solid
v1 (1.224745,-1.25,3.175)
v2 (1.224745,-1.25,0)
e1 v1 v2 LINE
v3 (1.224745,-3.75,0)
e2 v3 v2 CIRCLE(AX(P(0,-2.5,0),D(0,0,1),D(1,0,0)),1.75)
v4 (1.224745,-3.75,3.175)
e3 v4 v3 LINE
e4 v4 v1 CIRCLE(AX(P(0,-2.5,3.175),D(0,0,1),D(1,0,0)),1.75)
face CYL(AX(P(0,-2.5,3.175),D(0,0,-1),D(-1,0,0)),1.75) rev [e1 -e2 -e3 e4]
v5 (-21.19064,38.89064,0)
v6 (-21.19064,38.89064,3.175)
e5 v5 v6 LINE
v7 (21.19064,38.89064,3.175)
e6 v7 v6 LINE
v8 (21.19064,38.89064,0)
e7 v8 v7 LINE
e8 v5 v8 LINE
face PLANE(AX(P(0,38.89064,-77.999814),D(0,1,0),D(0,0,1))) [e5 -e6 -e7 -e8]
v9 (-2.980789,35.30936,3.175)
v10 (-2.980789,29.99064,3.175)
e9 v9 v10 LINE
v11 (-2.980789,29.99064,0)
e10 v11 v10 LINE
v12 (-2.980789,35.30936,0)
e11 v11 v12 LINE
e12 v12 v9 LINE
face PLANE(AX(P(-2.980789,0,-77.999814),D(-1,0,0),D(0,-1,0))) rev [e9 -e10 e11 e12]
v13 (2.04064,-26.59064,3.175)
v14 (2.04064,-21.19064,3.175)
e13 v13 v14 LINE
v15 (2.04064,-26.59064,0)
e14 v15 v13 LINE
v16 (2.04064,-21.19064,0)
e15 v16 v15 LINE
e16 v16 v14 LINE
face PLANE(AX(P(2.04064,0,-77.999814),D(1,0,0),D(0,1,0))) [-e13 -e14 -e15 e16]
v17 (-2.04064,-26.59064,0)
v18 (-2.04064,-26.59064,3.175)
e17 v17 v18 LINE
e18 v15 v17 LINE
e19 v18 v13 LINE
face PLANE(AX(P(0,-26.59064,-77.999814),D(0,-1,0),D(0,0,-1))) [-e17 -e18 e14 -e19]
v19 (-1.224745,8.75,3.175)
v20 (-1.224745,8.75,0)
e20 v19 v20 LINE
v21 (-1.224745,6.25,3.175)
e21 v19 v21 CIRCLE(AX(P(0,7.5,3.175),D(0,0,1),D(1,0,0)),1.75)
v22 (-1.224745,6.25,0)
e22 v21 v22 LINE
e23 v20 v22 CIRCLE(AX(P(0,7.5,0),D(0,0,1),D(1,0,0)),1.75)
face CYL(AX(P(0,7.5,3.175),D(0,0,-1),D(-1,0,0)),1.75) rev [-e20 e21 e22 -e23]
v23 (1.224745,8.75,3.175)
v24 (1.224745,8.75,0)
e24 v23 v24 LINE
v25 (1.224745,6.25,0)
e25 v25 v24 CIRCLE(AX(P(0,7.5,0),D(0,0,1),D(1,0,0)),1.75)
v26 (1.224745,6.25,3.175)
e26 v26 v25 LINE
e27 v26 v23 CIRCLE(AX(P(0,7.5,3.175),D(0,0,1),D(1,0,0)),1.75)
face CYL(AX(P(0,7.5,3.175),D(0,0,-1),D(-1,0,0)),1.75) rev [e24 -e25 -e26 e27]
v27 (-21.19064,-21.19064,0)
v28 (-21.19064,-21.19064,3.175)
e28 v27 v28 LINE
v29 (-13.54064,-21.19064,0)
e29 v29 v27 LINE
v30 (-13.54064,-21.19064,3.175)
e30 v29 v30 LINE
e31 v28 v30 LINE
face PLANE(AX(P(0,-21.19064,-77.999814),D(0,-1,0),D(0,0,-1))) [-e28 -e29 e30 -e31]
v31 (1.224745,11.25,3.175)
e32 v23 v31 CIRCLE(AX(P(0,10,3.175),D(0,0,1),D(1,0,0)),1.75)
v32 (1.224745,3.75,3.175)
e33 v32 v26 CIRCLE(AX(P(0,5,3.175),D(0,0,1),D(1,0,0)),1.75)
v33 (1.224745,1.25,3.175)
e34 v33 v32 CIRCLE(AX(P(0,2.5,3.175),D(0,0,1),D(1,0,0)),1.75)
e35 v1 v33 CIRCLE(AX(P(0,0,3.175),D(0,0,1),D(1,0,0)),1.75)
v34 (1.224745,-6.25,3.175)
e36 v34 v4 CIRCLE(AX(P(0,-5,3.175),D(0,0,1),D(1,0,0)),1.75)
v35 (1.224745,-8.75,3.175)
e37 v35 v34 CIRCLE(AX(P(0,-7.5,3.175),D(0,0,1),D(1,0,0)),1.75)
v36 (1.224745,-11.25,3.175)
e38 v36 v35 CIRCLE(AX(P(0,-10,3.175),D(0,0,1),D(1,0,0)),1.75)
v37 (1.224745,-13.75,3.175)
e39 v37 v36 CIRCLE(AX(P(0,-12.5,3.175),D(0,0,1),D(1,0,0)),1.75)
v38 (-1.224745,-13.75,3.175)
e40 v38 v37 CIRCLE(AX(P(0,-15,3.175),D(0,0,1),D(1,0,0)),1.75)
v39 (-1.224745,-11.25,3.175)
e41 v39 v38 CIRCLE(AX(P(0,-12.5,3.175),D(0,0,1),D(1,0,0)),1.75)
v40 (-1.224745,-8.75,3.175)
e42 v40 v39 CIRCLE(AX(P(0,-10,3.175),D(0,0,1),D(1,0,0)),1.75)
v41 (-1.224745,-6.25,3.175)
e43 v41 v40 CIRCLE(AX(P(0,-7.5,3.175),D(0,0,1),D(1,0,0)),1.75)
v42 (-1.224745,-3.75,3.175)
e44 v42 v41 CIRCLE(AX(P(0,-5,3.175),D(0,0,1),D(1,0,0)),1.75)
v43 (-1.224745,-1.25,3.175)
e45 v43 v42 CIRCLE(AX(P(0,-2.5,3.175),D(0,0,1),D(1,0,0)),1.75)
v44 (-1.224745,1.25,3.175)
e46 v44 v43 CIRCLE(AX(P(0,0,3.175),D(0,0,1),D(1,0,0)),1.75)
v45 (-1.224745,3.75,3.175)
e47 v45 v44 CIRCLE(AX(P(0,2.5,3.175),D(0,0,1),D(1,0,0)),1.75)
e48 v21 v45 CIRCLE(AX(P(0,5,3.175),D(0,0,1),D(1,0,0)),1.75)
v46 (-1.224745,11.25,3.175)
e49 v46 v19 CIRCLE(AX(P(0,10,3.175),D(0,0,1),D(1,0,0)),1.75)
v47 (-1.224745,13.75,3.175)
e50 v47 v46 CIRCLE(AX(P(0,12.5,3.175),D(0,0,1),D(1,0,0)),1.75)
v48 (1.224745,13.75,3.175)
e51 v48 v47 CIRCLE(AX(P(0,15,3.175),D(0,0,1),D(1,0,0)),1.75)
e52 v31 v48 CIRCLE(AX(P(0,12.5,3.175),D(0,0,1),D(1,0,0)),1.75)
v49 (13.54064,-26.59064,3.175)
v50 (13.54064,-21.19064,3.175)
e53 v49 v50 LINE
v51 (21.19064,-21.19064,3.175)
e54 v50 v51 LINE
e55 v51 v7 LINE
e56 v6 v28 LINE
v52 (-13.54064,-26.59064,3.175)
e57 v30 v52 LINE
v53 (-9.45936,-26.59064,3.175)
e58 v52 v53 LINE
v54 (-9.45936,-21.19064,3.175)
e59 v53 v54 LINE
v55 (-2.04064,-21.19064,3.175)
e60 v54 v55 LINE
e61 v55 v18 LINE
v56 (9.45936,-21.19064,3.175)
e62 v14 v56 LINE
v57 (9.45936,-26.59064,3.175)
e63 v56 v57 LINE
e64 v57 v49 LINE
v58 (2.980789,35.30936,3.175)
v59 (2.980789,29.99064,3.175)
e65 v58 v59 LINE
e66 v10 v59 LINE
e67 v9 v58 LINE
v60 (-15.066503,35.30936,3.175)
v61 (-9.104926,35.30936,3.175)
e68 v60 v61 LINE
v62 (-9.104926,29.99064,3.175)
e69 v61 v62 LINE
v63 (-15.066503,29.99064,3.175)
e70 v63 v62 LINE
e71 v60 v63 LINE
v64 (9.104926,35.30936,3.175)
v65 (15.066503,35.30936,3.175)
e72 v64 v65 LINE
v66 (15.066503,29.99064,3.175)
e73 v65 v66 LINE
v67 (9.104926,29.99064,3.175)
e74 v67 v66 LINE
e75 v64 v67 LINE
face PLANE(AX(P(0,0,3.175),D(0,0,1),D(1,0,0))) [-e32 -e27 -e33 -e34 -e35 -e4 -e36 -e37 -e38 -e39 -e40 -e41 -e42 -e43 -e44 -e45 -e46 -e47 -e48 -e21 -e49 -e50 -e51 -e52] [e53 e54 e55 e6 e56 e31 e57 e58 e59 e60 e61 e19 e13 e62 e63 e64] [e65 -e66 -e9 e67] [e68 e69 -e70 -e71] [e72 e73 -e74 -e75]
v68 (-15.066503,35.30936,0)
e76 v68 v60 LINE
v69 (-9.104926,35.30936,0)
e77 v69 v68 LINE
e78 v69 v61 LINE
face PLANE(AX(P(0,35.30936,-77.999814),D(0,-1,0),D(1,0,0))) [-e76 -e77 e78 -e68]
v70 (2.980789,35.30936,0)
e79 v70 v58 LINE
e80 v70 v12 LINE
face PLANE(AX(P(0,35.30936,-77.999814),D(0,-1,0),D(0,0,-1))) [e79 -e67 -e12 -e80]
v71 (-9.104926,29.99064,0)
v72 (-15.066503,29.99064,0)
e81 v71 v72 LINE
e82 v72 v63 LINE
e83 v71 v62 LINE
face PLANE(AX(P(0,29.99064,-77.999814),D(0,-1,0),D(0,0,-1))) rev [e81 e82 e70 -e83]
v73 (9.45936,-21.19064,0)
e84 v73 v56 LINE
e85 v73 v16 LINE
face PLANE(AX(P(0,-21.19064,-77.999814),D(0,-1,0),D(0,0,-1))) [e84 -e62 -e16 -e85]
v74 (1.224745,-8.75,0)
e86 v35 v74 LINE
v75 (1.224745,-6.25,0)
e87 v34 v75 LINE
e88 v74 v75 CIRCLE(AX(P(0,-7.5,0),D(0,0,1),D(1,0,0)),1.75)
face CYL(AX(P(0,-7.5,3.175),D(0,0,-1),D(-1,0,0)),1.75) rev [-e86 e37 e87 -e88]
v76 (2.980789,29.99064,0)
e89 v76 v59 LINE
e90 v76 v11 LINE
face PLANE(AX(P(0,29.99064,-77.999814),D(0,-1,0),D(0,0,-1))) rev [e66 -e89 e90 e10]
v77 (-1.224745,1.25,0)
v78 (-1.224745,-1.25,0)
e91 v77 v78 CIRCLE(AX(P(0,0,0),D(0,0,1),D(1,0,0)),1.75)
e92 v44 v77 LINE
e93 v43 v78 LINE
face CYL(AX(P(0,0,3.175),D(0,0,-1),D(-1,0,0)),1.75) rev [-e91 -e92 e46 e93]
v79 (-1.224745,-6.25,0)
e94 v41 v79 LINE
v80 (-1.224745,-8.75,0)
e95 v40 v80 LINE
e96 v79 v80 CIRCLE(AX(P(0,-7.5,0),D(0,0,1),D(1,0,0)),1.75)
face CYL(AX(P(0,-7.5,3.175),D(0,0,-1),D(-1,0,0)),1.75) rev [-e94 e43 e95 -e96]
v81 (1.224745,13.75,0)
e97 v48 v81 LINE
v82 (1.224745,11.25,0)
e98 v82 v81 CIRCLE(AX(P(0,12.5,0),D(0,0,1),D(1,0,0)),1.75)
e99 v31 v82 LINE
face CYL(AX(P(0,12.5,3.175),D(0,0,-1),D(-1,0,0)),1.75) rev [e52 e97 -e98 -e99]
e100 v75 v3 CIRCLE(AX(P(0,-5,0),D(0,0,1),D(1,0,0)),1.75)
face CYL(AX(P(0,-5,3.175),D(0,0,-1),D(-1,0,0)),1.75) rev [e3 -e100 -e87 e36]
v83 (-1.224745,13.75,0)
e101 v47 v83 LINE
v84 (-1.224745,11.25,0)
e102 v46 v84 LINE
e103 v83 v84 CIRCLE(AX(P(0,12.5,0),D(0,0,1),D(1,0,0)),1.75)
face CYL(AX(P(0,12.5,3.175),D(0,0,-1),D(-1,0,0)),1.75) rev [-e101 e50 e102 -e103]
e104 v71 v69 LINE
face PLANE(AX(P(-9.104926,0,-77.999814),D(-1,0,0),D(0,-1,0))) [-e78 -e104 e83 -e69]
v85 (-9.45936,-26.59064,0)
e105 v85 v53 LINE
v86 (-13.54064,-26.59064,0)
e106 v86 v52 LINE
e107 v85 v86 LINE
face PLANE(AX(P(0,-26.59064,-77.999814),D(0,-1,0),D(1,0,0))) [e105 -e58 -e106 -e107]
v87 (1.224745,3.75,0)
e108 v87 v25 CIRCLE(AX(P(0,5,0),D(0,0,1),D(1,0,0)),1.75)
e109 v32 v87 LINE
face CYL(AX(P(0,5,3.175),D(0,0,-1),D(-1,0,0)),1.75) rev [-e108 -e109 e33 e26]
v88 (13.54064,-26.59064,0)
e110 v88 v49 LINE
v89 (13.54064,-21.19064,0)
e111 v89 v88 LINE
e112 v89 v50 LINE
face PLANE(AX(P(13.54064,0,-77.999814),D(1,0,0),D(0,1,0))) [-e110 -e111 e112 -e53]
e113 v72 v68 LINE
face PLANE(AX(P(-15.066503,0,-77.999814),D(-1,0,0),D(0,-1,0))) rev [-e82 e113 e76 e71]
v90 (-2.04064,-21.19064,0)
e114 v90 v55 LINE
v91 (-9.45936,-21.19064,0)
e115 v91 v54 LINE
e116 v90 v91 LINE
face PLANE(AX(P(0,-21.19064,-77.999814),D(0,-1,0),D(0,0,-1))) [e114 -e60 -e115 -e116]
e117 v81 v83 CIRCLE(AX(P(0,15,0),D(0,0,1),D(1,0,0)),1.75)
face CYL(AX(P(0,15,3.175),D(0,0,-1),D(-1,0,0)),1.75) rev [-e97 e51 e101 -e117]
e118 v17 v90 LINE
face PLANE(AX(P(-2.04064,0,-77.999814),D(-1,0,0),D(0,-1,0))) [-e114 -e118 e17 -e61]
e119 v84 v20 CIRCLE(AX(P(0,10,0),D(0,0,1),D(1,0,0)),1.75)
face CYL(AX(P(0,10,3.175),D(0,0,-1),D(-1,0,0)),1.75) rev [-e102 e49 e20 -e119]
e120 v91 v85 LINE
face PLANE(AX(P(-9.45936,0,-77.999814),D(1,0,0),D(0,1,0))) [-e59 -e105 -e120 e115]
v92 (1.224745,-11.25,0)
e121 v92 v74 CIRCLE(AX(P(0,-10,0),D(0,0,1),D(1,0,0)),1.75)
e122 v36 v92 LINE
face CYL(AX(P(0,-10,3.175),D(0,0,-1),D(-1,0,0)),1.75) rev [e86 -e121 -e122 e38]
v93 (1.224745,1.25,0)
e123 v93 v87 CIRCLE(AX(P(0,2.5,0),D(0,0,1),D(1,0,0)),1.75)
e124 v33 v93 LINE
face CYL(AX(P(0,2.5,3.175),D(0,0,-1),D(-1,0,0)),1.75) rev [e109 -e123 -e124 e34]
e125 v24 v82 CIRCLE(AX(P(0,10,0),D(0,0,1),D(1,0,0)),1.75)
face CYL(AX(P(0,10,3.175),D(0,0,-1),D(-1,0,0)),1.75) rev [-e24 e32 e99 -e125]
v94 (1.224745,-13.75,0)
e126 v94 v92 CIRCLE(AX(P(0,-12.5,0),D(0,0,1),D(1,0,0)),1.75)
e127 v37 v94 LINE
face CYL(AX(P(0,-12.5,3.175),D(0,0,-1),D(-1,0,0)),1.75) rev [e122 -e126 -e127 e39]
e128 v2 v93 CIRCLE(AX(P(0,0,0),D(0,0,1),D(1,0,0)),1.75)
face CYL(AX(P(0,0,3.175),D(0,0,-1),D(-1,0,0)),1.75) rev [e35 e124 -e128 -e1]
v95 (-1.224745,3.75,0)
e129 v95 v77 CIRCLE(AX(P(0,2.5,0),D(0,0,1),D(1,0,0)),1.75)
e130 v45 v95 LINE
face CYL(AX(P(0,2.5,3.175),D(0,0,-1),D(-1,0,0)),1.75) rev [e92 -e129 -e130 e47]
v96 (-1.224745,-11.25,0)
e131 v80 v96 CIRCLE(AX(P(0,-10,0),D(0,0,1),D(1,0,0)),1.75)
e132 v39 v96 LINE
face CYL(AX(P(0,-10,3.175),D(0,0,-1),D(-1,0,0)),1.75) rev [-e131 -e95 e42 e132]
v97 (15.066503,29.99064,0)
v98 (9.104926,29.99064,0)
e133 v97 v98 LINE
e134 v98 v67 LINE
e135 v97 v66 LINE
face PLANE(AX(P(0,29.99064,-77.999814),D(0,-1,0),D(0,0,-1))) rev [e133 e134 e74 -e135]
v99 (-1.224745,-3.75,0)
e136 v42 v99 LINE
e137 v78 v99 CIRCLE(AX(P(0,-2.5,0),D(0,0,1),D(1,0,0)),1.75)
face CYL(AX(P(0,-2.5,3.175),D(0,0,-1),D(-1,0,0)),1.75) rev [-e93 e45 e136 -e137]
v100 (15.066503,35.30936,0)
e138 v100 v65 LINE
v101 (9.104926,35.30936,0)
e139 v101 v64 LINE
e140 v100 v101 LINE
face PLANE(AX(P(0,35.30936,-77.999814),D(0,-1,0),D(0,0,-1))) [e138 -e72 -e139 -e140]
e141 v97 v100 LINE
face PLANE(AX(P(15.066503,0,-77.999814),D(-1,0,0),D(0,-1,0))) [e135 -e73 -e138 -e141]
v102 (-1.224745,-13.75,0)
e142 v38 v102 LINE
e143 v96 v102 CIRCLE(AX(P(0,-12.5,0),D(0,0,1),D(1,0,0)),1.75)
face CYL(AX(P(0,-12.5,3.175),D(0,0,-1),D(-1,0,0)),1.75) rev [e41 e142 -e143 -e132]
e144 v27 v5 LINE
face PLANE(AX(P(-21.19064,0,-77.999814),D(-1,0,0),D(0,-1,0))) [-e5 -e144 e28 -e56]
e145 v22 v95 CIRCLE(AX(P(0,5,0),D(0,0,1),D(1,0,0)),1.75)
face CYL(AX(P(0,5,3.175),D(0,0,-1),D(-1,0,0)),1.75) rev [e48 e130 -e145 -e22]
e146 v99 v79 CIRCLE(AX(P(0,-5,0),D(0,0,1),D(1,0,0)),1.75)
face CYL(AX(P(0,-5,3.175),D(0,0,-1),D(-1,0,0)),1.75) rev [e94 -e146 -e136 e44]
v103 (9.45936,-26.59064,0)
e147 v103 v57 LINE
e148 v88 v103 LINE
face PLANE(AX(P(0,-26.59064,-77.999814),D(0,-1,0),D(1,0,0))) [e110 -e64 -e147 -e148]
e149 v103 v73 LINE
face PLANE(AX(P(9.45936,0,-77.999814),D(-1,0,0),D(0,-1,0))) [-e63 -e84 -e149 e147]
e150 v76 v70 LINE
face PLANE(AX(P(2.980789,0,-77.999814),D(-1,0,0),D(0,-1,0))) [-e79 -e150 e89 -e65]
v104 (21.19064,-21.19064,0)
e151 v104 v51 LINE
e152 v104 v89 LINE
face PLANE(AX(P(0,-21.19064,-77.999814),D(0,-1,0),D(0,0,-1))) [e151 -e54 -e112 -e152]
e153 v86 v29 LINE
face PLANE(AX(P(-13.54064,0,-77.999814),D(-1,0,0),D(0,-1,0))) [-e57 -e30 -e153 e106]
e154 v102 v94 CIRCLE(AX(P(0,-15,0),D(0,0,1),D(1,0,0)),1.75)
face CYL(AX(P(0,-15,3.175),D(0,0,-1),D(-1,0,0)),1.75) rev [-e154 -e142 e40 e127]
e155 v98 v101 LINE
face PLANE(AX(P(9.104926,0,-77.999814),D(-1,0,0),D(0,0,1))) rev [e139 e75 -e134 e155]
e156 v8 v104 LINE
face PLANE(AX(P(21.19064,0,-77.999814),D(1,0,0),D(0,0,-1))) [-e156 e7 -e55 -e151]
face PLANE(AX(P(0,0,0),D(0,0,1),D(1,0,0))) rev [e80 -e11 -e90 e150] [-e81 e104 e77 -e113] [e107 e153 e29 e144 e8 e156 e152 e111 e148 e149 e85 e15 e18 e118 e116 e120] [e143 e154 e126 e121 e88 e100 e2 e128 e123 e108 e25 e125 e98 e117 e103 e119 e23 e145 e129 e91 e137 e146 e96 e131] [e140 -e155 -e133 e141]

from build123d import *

# Parameters (mm, degrees)
SKETCH1_W                 = 6.042857143
SKETCH1_H                 = 5.4
SKETCH1_W_2               = 6.042857142
SKETCH1_W_3               = 4
BOSS_EXTRUDE1_DEPTH       = 3.175
BOSS_EXTRUDE2_START       = -3.175
BOSS_EXTRUDE2_OUTLINE_W   = 6.042857143
BOSS_EXTRUDE2_OUTLINE_H   = 5.4
BOSS_EXTRUDE2_OUTLINE_W_2 = 5.961577143
BOSS_EXTRUDE2_OUTLINE_H_2 = 5.31872
BOSS_EXTRUDE2_OUTLINE_W_3 = 6.042857142
BOSS_EXTRUDE2_OUTLINE_W_4 = 5.961577142
BOSS_EXTRUDE2_DEPTH       = 3.175


# Read off the part's stored shape, not the designer's step: Boss-Extrude2
with BuildPart() as part:
    # Sketch1 → Boss-Extrude1 (new body)
    # profile 1 of 4: a face of its own
    with BuildSketch(Plane.XY):
        Polygon((21.15, 38.85), (-21.15, 38.85), (-21.15, -21.15), (-13.5, -21.15), (-9.5, -21.15), (-2, -21.15), (2, -21.15), (9.5, -21.15), (13.5, -21.15), (21.15, -21.15), align=None)
        with BuildLine():
            ThreePointArc((-1.224744871, 11.25), (-1.75, 12.5), (-1.224744871, 13.75))
            ThreePointArc((-1.224744871, 13.75), (-0.67793675, 16.613351097), (1.75, 15))
            ThreePointArc((1.75, 15), (1.613351097, 14.32206325), (1.224744871, 13.75))
            ThreePointArc((1.224744871, 13.75), (1.613351097, 13.17793675), (1.75, 12.5))
            ThreePointArc((1.75, 12.5), (1.613351097, 11.82206325), (1.224744871, 11.25))
            ThreePointArc((1.224744871, 11.25), (1.613351097, 10.67793675), (1.75, 10))
            ThreePointArc((1.75, 10), (1.613351097, 9.32206325), (1.224744871, 8.75))
            ThreePointArc((1.224744871, 8.75), (1.613351097, 8.17793675), (1.75, 7.5))
            ThreePointArc((1.75, 7.5), (1.613351097, 6.82206325), (1.224744871, 6.25))
            ThreePointArc((1.224744871, 6.25), (1.613351097, 5.67793675), (1.75, 5))
            ThreePointArc((1.75, 5), (1.613351097, 4.32206325), (1.224744871, 3.75))
            ThreePointArc((1.224744871, 3.75), (1.613351097, 3.17793675), (1.75, 2.5))
            ThreePointArc((1.75, 2.5), (1.613351097, 1.82206325), (1.224744871, 1.25))
            ThreePointArc((1.224744871, 1.25), (1.613351097, 0.67793675), (1.75, 0))
            ThreePointArc((1.75, 0), (1.613351097, -0.67793675), (1.224744871, -1.25))
            ThreePointArc((1.224744871, -1.25), (1.613351097, -1.82206325), (1.75, -2.5))
            ThreePointArc((1.75, -2.5), (1.613351097, -3.17793675), (1.224744871, -3.75))
            ThreePointArc((1.224744871, -3.75), (1.613351097, -4.32206325), (1.75, -5))
            ThreePointArc((1.75, -5), (1.613351097, -5.67793675), (1.224744871, -6.25))
            ThreePointArc((1.224744871, -6.25), (1.613351097, -6.82206325), (1.75, -7.5))
            ThreePointArc((1.75, -7.5), (1.613351097, -8.17793675), (1.224744871, -8.75))
            ThreePointArc((1.224744871, -8.75), (1.613351097, -9.32206325), (1.75, -10))
            ThreePointArc((1.75, -10), (1.613351097, -10.67793675), (1.224744871, -11.25))
            ThreePointArc((1.224744871, -11.25), (1.613351097, -11.82206325), (1.75, -12.5))
            ThreePointArc((1.75, -12.5), (1.613351097, -13.17793675), (1.224744871, -13.75))
            ThreePointArc((1.224744871, -13.75), (1.613351097, -14.32206325), (1.75, -15))
            ThreePointArc((1.75, -15), (-0.67793675, -16.613351097), (-1.224744871, -13.75))
            ThreePointArc((-1.224744871, -13.75), (-1.75, -12.5), (-1.224744871, -11.25))
            ThreePointArc((-1.224744871, -11.25), (-1.75, -10), (-1.224744871, -8.75))
            ThreePointArc((-1.224744871, -8.75), (-1.75, -7.5), (-1.224744871, -6.25))
            ThreePointArc((-1.224744871, -6.25), (-1.75, -5), (-1.224744871, -3.75))
            ThreePointArc((-1.224744871, -3.75), (-1.75, -2.5), (-1.224744871, -1.25))
            ThreePointArc((-1.224744871, -1.25), (-1.75, 0), (-1.224744871, 1.25))
            ThreePointArc((-1.224744871, 1.25), (-1.75, 2.5), (-1.224744871, 3.75))
            ThreePointArc((-1.224744871, 3.75), (-1.75, 5), (-1.224744871, 6.25))
            ThreePointArc((-1.224744871, 6.25), (-1.75, 7.5), (-1.224744871, 8.75))
            ThreePointArc((-1.224744871, 8.75), (-1.75, 10), (-1.224744871, 11.25))
        make_face(mode=Mode.SUBTRACT)
        with Locations((-12.085714285, 32.65)):
            Rectangle(SKETCH1_W, SKETCH1_H, mode=Mode.SUBTRACT)
        with Locations((0, 32.65)):
            Rectangle(SKETCH1_W_2, SKETCH1_H, mode=Mode.SUBTRACT)
        with Locations((12.085714285, 32.65)):
            Rectangle(SKETCH1_W, SKETCH1_H, mode=Mode.SUBTRACT)
    # profile 2 of 4: a face of its own
    with BuildSketch(Plane.XY):
        with Locations((-11.5, -23.85)):
            Rectangle(SKETCH1_W_3, SKETCH1_H)
    # profile 3 of 4: a face of its own
    with BuildSketch(Plane.XY):
        with Locations((11.5, -23.85)):
            Rectangle(SKETCH1_W_3, SKETCH1_H)
    # profile 4 of 4: a face of its own
    with BuildSketch(Plane.XY):
        with Locations((0, -23.85)):
            Rectangle(SKETCH1_W_3, SKETCH1_H)
    extrude(amount=BOSS_EXTRUDE1_DEPTH)

    # Boss-Extrude2 outline → Boss-Extrude2 (add)
    # profile 1 of 4: a face of its own
    with BuildSketch(Plane.XY.offset(3.175).offset(BOSS_EXTRUDE2_START)):
        Polygon((13.54064, -26.59064), (13.54064, -21.19064), (21.19064, -21.19064), (21.19064, 38.89064), (-21.19064, 38.89064), (-21.19064, -21.19064), (-13.54064, -21.19064), (-13.54064, -26.59064), (-9.45936, -26.59064), (-9.45936, -21.19064), (-2.04064, -21.19064), (-2.04064, -26.59064), (2.04064, -26.59064), (2.04064, -21.19064), (9.45936, -21.19064), (9.45936, -26.59064), align=None)
        Polygon((21.15, 38.85), (21.15, -21.15), (13.5, -21.15), (13.5, -26.55), (9.5, -26.55), (9.5, -21.15), (2, -21.15), (2, -26.55), (-2, -26.55), (-2, -21.15), (-9.5, -21.15), (-9.5, -26.55), (-13.5, -26.55), (-13.5, -21.15), (-21.15, -21.15), (-21.15, 38.85), align=None, mode=Mode.SUBTRACT)
    # profile 2 of 4: a face of its own
    with BuildSketch(Plane.XY.offset(3.175).offset(BOSS_EXTRUDE2_START)):
        with Locations((12.085714285, 32.65)):
            Rectangle(BOSS_EXTRUDE2_OUTLINE_W, BOSS_EXTRUDE2_OUTLINE_H)
        with Locations((12.085714285, 32.65)):
            Rectangle(BOSS_EXTRUDE2_OUTLINE_W_2, BOSS_EXTRUDE2_OUTLINE_H_2, mode=Mode.SUBTRACT)
    # profile 3 of 4: a face of its own
    with BuildSketch(Plane.XY.offset(3.175).offset(BOSS_EXTRUDE2_START)):
        with Locations((0, 32.65)):
            Rectangle(BOSS_EXTRUDE2_OUTLINE_W_3, BOSS_EXTRUDE2_OUTLINE_H)
        with Locations((0, 32.65)):
            Rectangle(BOSS_EXTRUDE2_OUTLINE_W_4, BOSS_EXTRUDE2_OUTLINE_H_2, mode=Mode.SUBTRACT)
    # profile 4 of 4: a face of its own
    with BuildSketch(Plane.XY.offset(3.175).offset(BOSS_EXTRUDE2_START)):
        with Locations((-12.085714285, 32.65)):
            Rectangle(BOSS_EXTRUDE2_OUTLINE_W, BOSS_EXTRUDE2_OUTLINE_H)
        with Locations((-12.085714285, 32.65)):
            Rectangle(BOSS_EXTRUDE2_OUTLINE_W_2, BOSS_EXTRUDE2_OUTLINE_H_2, mode=Mode.SUBTRACT)
    extrude(amount=BOSS_EXTRUDE2_DEPTH)


solid = part.part
